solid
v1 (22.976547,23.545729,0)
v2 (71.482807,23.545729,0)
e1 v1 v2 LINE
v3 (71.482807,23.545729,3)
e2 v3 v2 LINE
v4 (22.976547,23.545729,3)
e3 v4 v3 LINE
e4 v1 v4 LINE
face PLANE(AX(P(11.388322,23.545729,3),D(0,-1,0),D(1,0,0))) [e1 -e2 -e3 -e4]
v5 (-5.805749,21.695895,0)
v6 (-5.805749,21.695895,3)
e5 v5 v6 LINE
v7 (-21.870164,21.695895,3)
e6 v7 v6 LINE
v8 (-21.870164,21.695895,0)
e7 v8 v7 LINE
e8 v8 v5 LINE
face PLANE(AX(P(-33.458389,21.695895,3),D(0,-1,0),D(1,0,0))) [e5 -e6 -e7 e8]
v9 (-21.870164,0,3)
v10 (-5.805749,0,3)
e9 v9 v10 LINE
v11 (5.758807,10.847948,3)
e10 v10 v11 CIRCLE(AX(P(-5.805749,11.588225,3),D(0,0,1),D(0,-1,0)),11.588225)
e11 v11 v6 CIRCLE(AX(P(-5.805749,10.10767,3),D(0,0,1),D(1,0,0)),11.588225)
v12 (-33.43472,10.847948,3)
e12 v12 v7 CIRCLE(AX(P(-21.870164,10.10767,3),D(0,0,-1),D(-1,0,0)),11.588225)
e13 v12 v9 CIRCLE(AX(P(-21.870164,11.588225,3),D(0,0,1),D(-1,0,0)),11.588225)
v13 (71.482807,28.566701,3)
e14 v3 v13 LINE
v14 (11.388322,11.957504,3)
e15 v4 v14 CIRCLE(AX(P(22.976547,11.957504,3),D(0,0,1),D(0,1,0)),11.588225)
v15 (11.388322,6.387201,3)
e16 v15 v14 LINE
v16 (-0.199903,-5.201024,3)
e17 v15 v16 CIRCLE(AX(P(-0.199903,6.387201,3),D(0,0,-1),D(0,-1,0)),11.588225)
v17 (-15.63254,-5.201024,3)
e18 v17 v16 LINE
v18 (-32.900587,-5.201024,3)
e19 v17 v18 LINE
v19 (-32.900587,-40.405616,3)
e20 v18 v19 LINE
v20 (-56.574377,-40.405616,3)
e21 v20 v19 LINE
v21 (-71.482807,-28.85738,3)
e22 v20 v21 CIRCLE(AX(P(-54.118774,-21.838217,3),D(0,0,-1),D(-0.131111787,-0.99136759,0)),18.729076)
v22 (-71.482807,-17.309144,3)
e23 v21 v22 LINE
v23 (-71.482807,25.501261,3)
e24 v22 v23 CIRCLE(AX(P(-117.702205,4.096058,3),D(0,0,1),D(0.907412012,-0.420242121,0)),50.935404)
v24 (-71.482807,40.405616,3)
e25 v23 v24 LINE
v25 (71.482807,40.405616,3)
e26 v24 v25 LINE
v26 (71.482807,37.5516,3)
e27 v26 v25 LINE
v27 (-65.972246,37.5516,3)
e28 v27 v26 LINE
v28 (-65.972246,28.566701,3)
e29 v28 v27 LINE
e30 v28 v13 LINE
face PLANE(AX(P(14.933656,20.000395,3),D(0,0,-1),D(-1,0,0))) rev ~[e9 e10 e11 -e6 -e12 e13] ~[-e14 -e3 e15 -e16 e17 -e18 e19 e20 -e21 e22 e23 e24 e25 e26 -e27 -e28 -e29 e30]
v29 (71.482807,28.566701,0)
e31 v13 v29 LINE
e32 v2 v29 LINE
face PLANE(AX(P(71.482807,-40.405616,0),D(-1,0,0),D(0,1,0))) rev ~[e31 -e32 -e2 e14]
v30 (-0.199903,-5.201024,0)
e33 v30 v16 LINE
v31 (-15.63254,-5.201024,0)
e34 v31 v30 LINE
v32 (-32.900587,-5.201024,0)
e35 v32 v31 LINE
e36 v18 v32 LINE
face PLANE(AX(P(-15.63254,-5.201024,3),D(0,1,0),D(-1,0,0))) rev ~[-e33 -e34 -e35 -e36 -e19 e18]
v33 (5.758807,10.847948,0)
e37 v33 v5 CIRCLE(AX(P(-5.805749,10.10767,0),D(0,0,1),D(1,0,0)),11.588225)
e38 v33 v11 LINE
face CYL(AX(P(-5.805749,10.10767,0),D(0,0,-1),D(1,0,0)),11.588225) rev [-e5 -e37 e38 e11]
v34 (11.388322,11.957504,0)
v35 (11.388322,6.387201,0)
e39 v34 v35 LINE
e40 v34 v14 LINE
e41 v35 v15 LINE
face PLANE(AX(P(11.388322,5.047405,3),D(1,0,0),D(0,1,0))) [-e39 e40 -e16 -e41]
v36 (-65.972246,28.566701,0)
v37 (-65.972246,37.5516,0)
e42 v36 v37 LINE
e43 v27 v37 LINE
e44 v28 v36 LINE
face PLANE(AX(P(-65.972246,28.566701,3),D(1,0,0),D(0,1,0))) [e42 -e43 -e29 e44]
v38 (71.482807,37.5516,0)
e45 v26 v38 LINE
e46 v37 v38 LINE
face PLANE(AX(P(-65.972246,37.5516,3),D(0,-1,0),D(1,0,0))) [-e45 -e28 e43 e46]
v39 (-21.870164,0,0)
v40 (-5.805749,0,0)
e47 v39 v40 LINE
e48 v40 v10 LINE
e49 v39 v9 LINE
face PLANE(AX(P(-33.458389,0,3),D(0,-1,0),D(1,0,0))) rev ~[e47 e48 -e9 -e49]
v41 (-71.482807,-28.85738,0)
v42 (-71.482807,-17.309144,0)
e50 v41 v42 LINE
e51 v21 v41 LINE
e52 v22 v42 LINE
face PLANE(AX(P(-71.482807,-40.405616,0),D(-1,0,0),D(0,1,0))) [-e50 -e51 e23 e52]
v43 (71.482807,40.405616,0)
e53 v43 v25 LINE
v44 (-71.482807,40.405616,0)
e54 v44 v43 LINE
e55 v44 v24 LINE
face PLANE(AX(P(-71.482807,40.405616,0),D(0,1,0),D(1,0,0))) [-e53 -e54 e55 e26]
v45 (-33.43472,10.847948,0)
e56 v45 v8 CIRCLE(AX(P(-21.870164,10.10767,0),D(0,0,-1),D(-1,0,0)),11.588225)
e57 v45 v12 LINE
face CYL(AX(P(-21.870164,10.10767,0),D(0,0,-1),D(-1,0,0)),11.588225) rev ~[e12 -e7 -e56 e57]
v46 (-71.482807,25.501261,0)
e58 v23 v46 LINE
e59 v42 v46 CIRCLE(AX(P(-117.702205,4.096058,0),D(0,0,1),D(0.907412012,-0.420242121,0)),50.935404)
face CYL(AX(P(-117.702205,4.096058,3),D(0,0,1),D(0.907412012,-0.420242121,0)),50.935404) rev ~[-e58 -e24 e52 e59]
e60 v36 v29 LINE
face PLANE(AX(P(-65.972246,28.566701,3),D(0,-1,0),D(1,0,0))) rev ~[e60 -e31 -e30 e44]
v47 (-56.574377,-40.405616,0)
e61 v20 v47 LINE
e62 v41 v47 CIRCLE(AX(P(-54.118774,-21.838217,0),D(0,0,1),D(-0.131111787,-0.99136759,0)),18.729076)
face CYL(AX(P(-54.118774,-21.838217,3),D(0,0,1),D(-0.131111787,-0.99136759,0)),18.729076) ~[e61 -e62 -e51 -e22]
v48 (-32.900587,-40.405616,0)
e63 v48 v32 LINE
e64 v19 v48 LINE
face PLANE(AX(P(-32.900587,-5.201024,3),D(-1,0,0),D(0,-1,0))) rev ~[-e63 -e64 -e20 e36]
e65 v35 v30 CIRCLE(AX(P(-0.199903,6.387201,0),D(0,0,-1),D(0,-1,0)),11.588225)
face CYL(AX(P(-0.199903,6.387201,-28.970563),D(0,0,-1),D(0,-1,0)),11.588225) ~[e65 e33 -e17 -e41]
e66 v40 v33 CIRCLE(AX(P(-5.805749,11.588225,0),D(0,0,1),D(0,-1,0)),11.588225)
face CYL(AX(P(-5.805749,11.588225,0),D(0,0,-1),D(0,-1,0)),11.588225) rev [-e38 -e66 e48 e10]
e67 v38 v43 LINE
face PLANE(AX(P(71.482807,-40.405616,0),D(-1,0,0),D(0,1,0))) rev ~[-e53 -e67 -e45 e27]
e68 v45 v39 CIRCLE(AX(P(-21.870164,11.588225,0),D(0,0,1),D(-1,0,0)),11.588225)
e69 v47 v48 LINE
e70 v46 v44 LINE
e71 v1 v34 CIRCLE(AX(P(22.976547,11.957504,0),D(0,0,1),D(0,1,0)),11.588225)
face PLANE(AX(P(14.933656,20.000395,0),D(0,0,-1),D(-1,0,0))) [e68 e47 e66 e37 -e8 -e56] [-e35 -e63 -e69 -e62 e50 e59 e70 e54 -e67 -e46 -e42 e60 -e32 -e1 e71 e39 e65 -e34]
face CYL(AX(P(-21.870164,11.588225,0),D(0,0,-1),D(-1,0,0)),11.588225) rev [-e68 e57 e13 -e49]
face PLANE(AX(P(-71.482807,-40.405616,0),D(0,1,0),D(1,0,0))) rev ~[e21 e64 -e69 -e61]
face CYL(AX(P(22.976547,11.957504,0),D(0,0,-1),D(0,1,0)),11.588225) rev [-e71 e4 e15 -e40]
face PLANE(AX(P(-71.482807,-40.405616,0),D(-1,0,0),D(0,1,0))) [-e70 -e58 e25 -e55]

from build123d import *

# Parameters (mm, degrees)
F0_W         = 142.9656147957
F0_H         = 80.8112323284
F1_DEPTH     = 3
F2_W         = 137.4550536275
F2_H         = 8.9848991483
F2_W_2       = 60.0944850594
F2_H_2       = 18.4983238578
F3_DEPTH     = 52.3
F4_W         = 39.2408655025
F4_H         = 21.6958951205
F5_DEPTH     = 25
F6_W         = 3.3521875739
F6_H         = 44.7733802721
F6_W_2       = 40.9712046385
F7_DEPTH     = 25
F8_W         = 102.604271844
F8_H         = 18.422623165
F9_DEPTH     = 25
F10_T1_DEPTH = 3
F10_T3_DEPTH = 60.941125497
F12_DEPTH    = 25
F14_DEPTH    = 25
F16_DEPTH    = 25


# Not quite as in the source:
# - a fillet or chamfer that OpenCascade refuses, or shapes differently, is made with other operations: its cross-section is extruded or revolved along the edge and cut away or added


with BuildPart() as f1:
    # F0 (on Top) → F1 (new body)
    with BuildSketch(Plane.XY):
        Rectangle(F0_W, F0_H)
    extrude(amount=F1_DEPTH)

    # F2 (on face) → F3 (cut)
    with BuildSketch(Plane.XY.offset(3)):
        with Locations((2.7552805841, 33.0591509119)):
            Rectangle(F2_W, F2_H)
        with Locations((41.4355648682, 14.2965670675)):
            Rectangle(F2_W_2, F2_H_2)
    extrude(amount=-F3_DEPTH, mode=Mode.SUBTRACT)

    # F4 (on face) → F5 (cut)
    with BuildSketch(Plane.XY.offset(3)):
        with Locations((-13.8379565906, 10.8479475603)):
            Rectangle(F4_W, F4_H)
    extrude(amount=-F5_DEPTH, mode=Mode.SUBTRACT)

    # F6 (on face) → F7 (cut)
    with BuildSketch(Plane.XY.offset(3)):
        Polygon((98.6725464463, 0), (13.7504395097, 0), (13.7504395097, -5.2010240033), (17.1026270837, -5.2010240033), (17.1026270837, -49.9744042754), (13.7504395097, -49.9744042754), (13.7504395097, -55.2418604493), (98.6725464463, -55.2418604493), align=None)
        with Locations((15.4265332967, -27.5877141394)):
            Rectangle(F6_W, F6_H)
        with Locations((-6.7351628095, -27.5877141394)):
            Rectangle(F6_W_2, F6_H)
    extrude(amount=-F7_DEPTH, mode=Mode.SUBTRACT)

    # F8 (on face) → F9 (cut)
    with BuildSketch(Plane.XY.offset(3)):
        with Locations((62.6904582605, -4.1639064439)):
            Rectangle(F8_W, F8_H)
    extrude(amount=-F9_DEPTH, mode=Mode.SUBTRACT)

    # F10: fillet of radius 11.5882250994 on 7 edges, made by hand

    # F10_s2 → F10_t1 (join)
    with BuildSketch(Plane.XY):
        with BuildLine():
            ThreePointArc((22.9765474379, 23.5457289964), (14.7824348882, 20.1516164467), (11.3883223385, 11.957503897))
            Line((11.3883223385, 11.957503897), (11.3883223385, 23.5457289964))
            Line((11.3883223385, 23.5457289964), (22.9765474379, 23.5457289964))
        make_face()
        with BuildLine():
            ThreePointArc((-15.6325400293, -5.2010240033), (-23.826652579, -8.595136553), (-27.2207651287, -16.7892491027))
            Line((-27.2207651287, -16.7892491027), (-27.2207651287, -5.2010240033))
            Line((-27.2207651287, -5.2010240033), (-15.6325400293, -5.2010240033))
        make_face()
        with BuildLine():
            ThreePointArc((-33.4583893418, 10.1076700211), (-30.0642767921, 18.3017825708), (-21.8701642424, 21.6958951205))
            Line((-21.8701642424, 21.6958951205), (-33.4583893418, 21.6958951205))
            Line((-33.4583893418, 21.6958951205), (-33.4583893418, 10.1076700211))
        make_face()
        with BuildLine():
            ThreePointArc((-5.8057489387, 0), (2.388363611, 3.3941125497), (5.7824761607, 11.5882250994))
            Line((5.7824761607, 11.5882250994), (5.7824761607, 0))
            Line((5.7824761607, 0), (-5.8057489387, 0))
        make_face()
        with BuildLine():
            ThreePointArc((-33.4583893418, 11.5882250994), (-30.0642767921, 3.3941125497), (-21.8701642424, 0))
            Line((-21.8701642424, 0), (-33.4583893418, 0))
            Line((-33.4583893418, 0), (-33.4583893418, 11.5882250994))
        make_face()
        with BuildLine():
            ThreePointArc((5.7824761607, 10.1076700211), (2.388363611, 18.3017825708), (-5.8057489387, 21.6958951205))
            Line((-5.8057489387, 21.6958951205), (5.7824761607, 21.6958951205))
            Line((5.7824761607, 21.6958951205), (5.7824761607, 10.1076700211))
        make_face()
    extrude(amount=F10_T1_DEPTH)

    # F10_s4 → F10_t3 (cut)
    with BuildSketch(Plane.XY.offset(-28.9705627485)):
        with BuildLine():
            ThreePointArc((-0.1999027609, -5.2010240033), (7.9942097888, -1.8069114536), (11.3883223385, 6.3872010961))
            Line((11.3883223385, 6.3872010961), (11.3883223385, -5.2010240033))
            Line((11.3883223385, -5.2010240033), (-0.1999027609, -5.2010240033))
        make_face()
    extrude(amount=F10_T3_DEPTH, mode=Mode.SUBTRACT)

    # F11 (on face) → F12 (cut)
    with BuildSketch(Plane.XY.offset(3)):
        with BuildLine():
            Line((-71.4828073978, 25.5012605339), (-71.4828073978, -17.3091441393))
            ThreePointArc((-71.4828073978, -17.3091441393), (-66.7668008007, 4.0960581973), (-71.4828073978, 25.5012605339))
        make_face()
    extrude(amount=-F12_DEPTH, mode=Mode.SUBTRACT)

    # F13 (on face) → F14 (cut)
    with BuildSketch(Plane.XY.offset(3)):
        with BuildLine():
            ThreePointArc((-21.3245461018, -6.6952891353), (-30.1185964093, -13.4662376926), (-27.2207651287, -24.1799503565))
            Line((-27.2207651287, -24.1799503565), (-27.2207651287, -16.7892491027))
            ThreePointArc((-27.2207651287, -16.7892491027), (-25.6387183355, -10.944306275), (-21.3245461018, -6.6952891353))
        make_face()
        with BuildLine():
            ThreePointArc((-27.2207651287, -32.8327932205), (-29.4171017882, -37.101902666), (-32.9005867243, -40.4056161642))
            Line((-32.9005867243, -40.4056161642), (-27.2207651287, -40.4056161642))
            Line((-27.2207651287, -40.4056161642), (-27.2207651287, -32.8327932205))
        make_face()
        with BuildLine():
            ThreePointArc((-56.574376872, -40.4056161642), (-65.5880780241, -36.6447482344), (-71.4828073978, -28.8573801517))
            Line((-71.4828073978, -28.8573801517), (-71.4828073978, -40.4056161642))
            Line((-71.4828073978, -40.4056161642), (-56.574376872, -40.4056161642))
        make_face()
    extrude(amount=-F14_DEPTH, mode=Mode.SUBTRACT)

    # F15 (on face) → F16 (cut)
    with BuildSketch(Plane.XY.offset(3)):
        with BuildLine():
            Line((-32.9005867243, -5.2010240033), (-32.9005867243, -40.4056161642))
            ThreePointArc((-32.9005867243, -40.4056161642), (-29.4171017882, -37.101902666), (-27.2207651287, -32.8327932205))
            Line((-27.2207651287, -32.8327932205), (-27.2207651287, -24.1799503565))
            ThreePointArc((-27.2207651287, -24.1799503565), (-30.1185964093, -13.4662376926), (-21.3245461018, -6.6952891353))
            ThreePointArc((-21.3245461018, -6.6952891353), (-18.5749778542, -5.5808138595), (-15.6325400293, -5.2010240033))
            Line((-15.6325400293, -5.2010240033), (-32.9005867243, -5.2010240033))
        make_face()
    extrude(amount=-F16_DEPTH, mode=Mode.SUBTRACT)


solid = f1.part
